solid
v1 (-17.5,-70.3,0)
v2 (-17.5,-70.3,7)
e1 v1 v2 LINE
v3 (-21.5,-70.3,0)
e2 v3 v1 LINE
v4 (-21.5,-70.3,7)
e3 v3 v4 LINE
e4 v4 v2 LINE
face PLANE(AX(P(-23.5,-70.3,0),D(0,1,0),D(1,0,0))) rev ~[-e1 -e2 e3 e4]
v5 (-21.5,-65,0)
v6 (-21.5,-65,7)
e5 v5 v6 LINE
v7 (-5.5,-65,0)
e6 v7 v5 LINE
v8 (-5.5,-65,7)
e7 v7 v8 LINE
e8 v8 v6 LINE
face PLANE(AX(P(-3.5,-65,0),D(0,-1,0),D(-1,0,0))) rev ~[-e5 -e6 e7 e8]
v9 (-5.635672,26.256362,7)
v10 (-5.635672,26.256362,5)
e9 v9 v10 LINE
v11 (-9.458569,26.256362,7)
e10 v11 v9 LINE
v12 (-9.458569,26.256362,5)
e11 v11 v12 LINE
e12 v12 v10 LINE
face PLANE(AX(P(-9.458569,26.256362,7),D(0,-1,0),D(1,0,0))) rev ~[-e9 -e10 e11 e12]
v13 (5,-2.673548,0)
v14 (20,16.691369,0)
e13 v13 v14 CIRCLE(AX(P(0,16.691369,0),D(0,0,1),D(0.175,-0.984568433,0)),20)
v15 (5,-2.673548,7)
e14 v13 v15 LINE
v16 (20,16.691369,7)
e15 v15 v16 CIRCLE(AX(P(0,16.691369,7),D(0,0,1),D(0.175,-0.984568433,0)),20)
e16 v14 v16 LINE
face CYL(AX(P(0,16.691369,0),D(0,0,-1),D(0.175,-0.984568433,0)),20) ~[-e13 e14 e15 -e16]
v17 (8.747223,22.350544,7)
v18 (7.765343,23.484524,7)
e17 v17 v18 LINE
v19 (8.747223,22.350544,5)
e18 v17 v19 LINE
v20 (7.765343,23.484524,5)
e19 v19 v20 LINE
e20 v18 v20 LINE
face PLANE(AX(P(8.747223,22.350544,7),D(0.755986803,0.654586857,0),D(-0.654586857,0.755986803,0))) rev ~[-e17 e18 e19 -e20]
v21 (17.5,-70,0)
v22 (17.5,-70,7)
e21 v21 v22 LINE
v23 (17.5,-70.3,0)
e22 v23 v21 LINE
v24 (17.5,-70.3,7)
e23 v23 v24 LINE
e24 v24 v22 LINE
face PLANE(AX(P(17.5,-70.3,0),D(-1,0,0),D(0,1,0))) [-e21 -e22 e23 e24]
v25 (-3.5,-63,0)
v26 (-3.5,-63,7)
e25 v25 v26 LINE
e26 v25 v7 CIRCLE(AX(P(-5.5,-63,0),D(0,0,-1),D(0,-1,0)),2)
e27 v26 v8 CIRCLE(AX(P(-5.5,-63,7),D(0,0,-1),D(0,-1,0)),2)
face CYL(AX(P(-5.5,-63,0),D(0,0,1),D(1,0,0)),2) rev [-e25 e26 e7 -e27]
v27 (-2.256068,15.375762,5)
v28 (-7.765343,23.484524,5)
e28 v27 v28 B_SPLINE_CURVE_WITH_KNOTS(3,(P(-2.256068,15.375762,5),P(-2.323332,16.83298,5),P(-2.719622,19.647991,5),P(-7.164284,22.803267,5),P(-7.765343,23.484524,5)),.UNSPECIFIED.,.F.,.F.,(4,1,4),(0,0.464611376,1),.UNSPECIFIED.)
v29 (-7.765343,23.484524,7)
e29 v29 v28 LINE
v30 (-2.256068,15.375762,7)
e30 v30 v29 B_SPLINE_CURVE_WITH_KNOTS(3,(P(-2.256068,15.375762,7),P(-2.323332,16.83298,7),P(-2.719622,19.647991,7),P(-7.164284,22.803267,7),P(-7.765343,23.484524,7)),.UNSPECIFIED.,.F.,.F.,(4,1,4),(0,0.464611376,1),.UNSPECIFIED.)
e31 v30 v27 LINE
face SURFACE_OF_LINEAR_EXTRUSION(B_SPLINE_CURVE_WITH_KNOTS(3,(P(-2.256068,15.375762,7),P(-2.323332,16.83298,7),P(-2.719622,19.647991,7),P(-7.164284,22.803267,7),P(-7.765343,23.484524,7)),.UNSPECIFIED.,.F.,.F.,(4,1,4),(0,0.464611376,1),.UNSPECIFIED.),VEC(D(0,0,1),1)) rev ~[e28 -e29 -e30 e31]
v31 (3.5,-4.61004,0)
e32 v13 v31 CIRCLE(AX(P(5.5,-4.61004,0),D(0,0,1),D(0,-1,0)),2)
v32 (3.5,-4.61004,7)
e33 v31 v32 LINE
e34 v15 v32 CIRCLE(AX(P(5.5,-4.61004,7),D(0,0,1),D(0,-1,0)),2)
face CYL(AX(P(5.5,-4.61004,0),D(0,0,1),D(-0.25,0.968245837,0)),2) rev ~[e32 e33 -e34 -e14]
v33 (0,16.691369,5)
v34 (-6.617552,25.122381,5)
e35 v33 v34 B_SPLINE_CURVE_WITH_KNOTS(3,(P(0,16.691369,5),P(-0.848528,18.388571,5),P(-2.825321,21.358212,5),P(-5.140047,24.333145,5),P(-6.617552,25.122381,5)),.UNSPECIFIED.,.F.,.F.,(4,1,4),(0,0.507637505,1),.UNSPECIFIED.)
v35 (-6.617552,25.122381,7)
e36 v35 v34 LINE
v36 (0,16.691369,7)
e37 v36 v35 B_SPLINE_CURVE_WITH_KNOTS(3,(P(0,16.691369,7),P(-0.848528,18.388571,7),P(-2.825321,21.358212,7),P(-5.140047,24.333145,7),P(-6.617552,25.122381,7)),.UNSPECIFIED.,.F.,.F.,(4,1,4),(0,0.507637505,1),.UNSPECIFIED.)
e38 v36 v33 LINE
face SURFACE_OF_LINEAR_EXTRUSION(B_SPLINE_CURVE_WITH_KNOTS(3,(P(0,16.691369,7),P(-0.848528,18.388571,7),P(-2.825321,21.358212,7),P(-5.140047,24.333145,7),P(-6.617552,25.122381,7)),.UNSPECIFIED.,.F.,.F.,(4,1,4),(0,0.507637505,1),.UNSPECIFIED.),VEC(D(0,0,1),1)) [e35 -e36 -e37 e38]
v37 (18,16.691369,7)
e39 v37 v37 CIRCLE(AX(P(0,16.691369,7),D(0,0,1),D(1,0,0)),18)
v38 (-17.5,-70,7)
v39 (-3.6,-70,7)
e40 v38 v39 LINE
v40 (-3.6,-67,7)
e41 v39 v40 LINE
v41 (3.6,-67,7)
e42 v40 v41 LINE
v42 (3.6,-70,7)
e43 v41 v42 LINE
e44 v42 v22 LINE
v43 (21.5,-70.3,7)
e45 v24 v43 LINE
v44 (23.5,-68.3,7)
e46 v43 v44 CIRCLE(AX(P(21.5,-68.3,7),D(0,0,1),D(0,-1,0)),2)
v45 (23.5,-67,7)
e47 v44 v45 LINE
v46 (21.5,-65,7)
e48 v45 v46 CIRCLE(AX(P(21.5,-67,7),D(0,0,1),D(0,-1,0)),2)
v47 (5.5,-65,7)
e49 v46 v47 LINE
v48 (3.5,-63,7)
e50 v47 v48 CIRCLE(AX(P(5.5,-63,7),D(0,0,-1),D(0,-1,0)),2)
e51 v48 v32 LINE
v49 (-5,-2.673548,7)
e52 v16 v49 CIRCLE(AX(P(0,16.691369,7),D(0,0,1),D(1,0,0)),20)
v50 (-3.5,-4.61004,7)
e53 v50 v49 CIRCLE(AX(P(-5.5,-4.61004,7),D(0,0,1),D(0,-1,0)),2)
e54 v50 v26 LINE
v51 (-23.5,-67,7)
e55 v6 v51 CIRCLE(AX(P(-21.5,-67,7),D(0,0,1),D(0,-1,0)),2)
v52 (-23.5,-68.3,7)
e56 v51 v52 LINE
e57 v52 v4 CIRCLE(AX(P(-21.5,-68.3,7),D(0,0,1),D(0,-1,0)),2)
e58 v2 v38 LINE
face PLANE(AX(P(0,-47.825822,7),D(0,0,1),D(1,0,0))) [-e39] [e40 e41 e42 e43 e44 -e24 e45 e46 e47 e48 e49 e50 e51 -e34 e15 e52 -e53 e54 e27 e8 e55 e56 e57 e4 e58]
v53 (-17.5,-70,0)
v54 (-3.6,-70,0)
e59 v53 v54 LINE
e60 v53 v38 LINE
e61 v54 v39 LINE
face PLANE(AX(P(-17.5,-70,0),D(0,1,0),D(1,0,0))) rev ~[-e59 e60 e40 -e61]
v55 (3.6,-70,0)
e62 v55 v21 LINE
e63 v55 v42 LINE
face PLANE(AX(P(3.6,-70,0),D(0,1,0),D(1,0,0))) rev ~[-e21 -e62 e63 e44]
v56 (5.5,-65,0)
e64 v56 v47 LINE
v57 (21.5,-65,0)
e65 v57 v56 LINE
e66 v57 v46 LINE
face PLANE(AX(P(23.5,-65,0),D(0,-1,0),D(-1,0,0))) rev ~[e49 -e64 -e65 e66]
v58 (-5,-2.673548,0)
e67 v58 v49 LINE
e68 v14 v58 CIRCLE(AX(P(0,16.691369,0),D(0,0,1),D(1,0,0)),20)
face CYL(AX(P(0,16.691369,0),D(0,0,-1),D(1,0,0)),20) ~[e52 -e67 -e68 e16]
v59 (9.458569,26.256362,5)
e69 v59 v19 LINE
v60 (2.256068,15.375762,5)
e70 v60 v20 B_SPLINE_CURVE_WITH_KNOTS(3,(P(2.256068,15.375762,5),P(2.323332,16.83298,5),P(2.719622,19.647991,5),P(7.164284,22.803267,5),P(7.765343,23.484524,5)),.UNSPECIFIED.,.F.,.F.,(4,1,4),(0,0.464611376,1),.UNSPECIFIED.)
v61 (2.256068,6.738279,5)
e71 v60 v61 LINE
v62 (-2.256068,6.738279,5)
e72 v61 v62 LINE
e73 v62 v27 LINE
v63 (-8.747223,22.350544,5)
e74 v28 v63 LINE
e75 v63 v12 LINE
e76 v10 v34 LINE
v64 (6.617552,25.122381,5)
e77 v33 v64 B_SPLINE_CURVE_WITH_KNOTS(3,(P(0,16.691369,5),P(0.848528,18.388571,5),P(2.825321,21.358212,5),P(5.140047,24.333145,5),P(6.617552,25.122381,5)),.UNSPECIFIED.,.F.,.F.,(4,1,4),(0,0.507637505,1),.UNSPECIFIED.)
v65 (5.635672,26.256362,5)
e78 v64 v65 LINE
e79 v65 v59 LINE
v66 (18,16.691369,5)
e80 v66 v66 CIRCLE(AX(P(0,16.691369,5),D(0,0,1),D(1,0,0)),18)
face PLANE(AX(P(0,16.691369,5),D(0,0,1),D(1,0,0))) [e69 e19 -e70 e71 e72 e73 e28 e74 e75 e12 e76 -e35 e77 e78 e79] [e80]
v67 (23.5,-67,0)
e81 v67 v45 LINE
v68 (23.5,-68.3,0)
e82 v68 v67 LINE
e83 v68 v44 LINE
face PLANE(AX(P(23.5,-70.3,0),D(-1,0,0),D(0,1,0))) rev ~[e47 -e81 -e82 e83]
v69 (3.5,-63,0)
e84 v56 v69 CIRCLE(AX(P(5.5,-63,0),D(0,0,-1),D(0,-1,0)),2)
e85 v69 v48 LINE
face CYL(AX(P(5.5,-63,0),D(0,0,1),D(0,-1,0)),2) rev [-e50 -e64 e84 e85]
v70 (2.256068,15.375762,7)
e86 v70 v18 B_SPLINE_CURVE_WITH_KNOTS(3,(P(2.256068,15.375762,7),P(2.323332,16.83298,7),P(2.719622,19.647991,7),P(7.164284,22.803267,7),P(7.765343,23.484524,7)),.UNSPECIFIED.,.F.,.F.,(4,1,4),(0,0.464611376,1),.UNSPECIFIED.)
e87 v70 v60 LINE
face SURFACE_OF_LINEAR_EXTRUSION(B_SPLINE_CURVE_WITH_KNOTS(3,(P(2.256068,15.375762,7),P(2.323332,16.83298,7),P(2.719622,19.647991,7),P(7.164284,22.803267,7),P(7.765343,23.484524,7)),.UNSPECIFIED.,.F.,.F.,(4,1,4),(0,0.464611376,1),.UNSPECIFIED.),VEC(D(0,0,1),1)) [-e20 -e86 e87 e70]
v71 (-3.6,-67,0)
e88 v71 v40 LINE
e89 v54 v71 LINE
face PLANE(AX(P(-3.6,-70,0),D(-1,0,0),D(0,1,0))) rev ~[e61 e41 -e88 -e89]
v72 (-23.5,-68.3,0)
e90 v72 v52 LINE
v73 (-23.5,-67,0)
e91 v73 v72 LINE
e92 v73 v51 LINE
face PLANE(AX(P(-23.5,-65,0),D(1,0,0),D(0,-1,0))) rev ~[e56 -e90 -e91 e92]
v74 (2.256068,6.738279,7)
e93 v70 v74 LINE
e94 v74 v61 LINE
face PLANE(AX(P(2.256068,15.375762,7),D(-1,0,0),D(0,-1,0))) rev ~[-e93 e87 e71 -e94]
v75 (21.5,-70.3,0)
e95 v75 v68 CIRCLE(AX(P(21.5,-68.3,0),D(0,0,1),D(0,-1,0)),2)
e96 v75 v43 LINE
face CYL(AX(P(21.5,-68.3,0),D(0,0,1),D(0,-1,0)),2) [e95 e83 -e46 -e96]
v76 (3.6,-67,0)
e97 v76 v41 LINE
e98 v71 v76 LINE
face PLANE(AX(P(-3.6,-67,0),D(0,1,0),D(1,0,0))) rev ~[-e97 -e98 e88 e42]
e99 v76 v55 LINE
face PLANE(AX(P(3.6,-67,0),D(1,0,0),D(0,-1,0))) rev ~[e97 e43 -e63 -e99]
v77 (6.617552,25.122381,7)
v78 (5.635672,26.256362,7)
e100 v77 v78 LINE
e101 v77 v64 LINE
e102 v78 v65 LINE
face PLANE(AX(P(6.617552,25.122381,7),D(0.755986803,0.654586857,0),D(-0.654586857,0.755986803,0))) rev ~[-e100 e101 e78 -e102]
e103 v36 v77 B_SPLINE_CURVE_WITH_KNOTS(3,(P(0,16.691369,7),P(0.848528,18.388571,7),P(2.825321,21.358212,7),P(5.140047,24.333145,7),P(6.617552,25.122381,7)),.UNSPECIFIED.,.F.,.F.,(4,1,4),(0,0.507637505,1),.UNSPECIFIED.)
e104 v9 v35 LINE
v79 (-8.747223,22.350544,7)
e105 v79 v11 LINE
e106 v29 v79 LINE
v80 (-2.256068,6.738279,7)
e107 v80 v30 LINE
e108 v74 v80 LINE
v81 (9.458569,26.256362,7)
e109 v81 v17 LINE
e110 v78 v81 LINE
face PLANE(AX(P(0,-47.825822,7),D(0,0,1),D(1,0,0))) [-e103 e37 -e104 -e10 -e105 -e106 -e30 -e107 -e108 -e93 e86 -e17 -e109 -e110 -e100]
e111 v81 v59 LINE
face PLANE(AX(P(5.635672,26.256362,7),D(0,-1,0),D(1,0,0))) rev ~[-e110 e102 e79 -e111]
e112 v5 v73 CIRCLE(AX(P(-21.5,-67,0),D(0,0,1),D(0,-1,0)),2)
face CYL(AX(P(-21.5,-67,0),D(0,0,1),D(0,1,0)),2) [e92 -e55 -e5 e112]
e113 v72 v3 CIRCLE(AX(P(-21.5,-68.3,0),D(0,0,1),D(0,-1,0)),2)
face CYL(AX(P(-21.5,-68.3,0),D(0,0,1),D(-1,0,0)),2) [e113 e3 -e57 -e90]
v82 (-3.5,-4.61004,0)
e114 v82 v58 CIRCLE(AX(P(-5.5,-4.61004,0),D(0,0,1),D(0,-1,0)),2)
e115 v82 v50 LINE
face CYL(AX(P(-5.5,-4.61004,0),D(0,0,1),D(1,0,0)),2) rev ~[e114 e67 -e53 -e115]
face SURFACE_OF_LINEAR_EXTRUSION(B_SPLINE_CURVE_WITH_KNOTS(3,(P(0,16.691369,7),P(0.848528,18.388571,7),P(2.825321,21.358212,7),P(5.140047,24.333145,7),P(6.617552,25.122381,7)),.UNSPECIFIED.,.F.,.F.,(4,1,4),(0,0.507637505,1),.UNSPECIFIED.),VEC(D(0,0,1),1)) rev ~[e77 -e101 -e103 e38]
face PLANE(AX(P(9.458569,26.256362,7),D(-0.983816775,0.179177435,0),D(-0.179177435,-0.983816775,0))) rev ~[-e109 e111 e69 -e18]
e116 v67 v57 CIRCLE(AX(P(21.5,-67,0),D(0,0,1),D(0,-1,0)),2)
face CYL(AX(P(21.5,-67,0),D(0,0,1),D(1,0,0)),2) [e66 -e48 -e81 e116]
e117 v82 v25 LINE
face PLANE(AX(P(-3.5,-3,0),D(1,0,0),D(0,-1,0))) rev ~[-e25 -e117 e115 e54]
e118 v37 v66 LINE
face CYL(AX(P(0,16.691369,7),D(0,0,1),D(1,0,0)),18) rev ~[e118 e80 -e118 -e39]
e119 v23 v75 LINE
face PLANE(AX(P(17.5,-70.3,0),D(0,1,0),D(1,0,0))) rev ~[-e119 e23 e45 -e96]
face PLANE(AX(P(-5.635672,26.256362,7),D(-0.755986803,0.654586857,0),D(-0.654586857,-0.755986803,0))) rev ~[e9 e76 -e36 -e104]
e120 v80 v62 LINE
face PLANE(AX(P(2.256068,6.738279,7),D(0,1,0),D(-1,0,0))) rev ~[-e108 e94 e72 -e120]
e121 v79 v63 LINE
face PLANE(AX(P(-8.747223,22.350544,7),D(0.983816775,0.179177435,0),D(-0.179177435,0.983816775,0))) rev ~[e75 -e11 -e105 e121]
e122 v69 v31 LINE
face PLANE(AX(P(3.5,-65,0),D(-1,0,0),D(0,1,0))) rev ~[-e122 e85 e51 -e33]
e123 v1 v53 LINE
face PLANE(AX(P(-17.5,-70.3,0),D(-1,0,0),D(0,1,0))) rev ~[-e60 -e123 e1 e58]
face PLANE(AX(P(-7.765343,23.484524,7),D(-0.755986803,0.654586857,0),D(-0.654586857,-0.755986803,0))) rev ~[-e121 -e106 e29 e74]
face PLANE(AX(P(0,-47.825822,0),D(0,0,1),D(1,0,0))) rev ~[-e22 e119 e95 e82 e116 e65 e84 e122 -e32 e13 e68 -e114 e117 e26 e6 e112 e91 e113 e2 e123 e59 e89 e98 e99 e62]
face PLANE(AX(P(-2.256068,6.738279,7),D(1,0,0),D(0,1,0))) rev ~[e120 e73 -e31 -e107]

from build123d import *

# Parameters (mm, degrees)
F0_W     = 6
F0_H     = 0.3
F1_DEPTH = 7
F2_R     = 18
F3_DEPTH = 2
F4_R     = 2


# Not quite as in the source:
# - a feature names something its author has since deleted; it is built from what else it names


with BuildPart() as f1:
    # F0 (on Top) → F1 (new body)
    with BuildSketch(Plane.XY):
        with BuildLine():
            ThreePointArc((3.5, -3), (0, -3.3086313325), (-3.5, -3))
            Line((-3.5, -3), (-3.5, -65))
            Line((-3.5, -65), (-23.5, -65))
            Line((-23.5, -65), (-23.5, -70))
            Line((-23.5, -70), (-17.5, -70))
            Line((-17.5, -70), (-3.6, -70))
            Line((-3.6, -70), (-3.6, -67))
            Line((-3.6, -67), (3.6, -67))
            Line((3.6, -67), (3.6, -70))
            Line((3.6, -70), (17.5, -70))
            Line((17.5, -70), (23.5, -70))
            Line((23.5, -70), (23.5, -65))
            Line((23.5, -65), (3.5, -65))
            Line((3.5, -65), (3.5, -3))
        make_face()
        with BuildLine():
            ThreePointArc((20, 16.6913686675), (-12.8452325787, 32.0210783843), (-3.5, -3))
            ThreePointArc((-3.5, -3), (0, -3.3086313325), (3.5, -3))
            ThreePointArc((3.5, -3), (15.3297097168, 3.8461360889), (20, 16.6913686675))
        make_face()
        with Locations((-20.5, -70.15)):
            Rectangle(F0_W, F0_H)
        with Locations((20.5, -70.15)):
            Rectangle(F0_W, F0_H)
    extrude(amount=F1_DEPTH)

    # F2 (on face) → F3 (cut)
    with BuildSketch(Plane.XY.offset(7)):
        with Locations((0, 16.6913686675)):
            Circle(F2_R)
        with BuildLine():
            Line((0, 6.7382790148), (-2.256068401, 6.7382790148))
            Line((-2.256068401, 6.7382790148), (-2.256068401, 15.3757622465))
            add(Edge.make_bspline(
                [(-2.256068401, 15.3757622465), (-2.3233316964, 16.8329796939), (-2.719622442, 19.6479913649), (-7.1642837958, 22.803266535), (-7.7653425934, 23.4845241077)],
                knots=[0, 0, 0, 0, 0.4646113757, 1, 1, 1, 1], degree=3))
            Line((-7.7653425934, 23.4845241077), (-8.7472228794, 22.3505439034))
            Line((-8.7472228794, 22.3505439034), (-9.4585691677, 26.2563616887))
            Line((-9.4585691677, 26.2563616887), (-5.635671728, 26.2563616887))
            Line((-5.635671728, 26.2563616887), (-6.6175520141, 25.1223814843))
            add(Edge.make_bspline(
                [(0, 16.6913686675), (-0.8485280711, 18.3885709355), (-2.8253206301, 21.3582120071), (-5.1400469891, 24.3331446203), (-6.6175520141, 25.1223814843)],
                knots=[0, 0, 0, 0, 0.5076375045, 1, 1, 1, 1], degree=3))
            add(Edge.make_bspline(
                [(0, 16.6913686675), (0.8485280711, 18.3885709355), (2.8253206301, 21.3582120071), (5.1400469891, 24.3331446203), (6.6175520141, 25.1223814843)],
                knots=[0, 0, 0, 0, 0.5076375045, 1, 1, 1, 1], degree=3))
            Line((6.6175520141, 25.1223814843), (5.635671728, 26.2563616887))
            Line((5.635671728, 26.2563616887), (9.4585691677, 26.2563616887))
            Line((9.4585691677, 26.2563616887), (8.7472228794, 22.3505439034))
            Line((8.7472228794, 22.3505439034), (7.7653425934, 23.4845241077))
            add(Edge.make_bspline(
                [(2.256068401, 15.3757622465), (2.3233316964, 16.8329796939), (2.719622442, 19.6479913649), (7.1642837958, 22.803266535), (7.7653425934, 23.4845241077)],
                knots=[0, 0, 0, 0, 0.4646113757, 1, 1, 1, 1], degree=3))
            Line((2.256068401, 15.3757622465), (2.256068401, 6.7382790148))
            Line((2.256068401, 6.7382790148), (0, 6.7382790148))
        make_face(mode=Mode.SUBTRACT)
    extrude(amount=-F3_DEPTH, mode=Mode.SUBTRACT)

    # F4
    f4_edges = [f1.edges().sort_by_distance(p)[0] for p in [
        (-3.5, -3, 3.5),
        (3.5, -3, 3.5),
        (23.5, -65, 3.5),
        (-23.5, -65, 3.5),
        (-3.5, -65, 3.5),
        (3.5, -65, 3.5),
        (-23.5, -70.3, 3.5),
        (23.5, -70.3, 3.5),
    ]]
    fillet(f4_edges, radius=F4_R)


solid = f1.part
